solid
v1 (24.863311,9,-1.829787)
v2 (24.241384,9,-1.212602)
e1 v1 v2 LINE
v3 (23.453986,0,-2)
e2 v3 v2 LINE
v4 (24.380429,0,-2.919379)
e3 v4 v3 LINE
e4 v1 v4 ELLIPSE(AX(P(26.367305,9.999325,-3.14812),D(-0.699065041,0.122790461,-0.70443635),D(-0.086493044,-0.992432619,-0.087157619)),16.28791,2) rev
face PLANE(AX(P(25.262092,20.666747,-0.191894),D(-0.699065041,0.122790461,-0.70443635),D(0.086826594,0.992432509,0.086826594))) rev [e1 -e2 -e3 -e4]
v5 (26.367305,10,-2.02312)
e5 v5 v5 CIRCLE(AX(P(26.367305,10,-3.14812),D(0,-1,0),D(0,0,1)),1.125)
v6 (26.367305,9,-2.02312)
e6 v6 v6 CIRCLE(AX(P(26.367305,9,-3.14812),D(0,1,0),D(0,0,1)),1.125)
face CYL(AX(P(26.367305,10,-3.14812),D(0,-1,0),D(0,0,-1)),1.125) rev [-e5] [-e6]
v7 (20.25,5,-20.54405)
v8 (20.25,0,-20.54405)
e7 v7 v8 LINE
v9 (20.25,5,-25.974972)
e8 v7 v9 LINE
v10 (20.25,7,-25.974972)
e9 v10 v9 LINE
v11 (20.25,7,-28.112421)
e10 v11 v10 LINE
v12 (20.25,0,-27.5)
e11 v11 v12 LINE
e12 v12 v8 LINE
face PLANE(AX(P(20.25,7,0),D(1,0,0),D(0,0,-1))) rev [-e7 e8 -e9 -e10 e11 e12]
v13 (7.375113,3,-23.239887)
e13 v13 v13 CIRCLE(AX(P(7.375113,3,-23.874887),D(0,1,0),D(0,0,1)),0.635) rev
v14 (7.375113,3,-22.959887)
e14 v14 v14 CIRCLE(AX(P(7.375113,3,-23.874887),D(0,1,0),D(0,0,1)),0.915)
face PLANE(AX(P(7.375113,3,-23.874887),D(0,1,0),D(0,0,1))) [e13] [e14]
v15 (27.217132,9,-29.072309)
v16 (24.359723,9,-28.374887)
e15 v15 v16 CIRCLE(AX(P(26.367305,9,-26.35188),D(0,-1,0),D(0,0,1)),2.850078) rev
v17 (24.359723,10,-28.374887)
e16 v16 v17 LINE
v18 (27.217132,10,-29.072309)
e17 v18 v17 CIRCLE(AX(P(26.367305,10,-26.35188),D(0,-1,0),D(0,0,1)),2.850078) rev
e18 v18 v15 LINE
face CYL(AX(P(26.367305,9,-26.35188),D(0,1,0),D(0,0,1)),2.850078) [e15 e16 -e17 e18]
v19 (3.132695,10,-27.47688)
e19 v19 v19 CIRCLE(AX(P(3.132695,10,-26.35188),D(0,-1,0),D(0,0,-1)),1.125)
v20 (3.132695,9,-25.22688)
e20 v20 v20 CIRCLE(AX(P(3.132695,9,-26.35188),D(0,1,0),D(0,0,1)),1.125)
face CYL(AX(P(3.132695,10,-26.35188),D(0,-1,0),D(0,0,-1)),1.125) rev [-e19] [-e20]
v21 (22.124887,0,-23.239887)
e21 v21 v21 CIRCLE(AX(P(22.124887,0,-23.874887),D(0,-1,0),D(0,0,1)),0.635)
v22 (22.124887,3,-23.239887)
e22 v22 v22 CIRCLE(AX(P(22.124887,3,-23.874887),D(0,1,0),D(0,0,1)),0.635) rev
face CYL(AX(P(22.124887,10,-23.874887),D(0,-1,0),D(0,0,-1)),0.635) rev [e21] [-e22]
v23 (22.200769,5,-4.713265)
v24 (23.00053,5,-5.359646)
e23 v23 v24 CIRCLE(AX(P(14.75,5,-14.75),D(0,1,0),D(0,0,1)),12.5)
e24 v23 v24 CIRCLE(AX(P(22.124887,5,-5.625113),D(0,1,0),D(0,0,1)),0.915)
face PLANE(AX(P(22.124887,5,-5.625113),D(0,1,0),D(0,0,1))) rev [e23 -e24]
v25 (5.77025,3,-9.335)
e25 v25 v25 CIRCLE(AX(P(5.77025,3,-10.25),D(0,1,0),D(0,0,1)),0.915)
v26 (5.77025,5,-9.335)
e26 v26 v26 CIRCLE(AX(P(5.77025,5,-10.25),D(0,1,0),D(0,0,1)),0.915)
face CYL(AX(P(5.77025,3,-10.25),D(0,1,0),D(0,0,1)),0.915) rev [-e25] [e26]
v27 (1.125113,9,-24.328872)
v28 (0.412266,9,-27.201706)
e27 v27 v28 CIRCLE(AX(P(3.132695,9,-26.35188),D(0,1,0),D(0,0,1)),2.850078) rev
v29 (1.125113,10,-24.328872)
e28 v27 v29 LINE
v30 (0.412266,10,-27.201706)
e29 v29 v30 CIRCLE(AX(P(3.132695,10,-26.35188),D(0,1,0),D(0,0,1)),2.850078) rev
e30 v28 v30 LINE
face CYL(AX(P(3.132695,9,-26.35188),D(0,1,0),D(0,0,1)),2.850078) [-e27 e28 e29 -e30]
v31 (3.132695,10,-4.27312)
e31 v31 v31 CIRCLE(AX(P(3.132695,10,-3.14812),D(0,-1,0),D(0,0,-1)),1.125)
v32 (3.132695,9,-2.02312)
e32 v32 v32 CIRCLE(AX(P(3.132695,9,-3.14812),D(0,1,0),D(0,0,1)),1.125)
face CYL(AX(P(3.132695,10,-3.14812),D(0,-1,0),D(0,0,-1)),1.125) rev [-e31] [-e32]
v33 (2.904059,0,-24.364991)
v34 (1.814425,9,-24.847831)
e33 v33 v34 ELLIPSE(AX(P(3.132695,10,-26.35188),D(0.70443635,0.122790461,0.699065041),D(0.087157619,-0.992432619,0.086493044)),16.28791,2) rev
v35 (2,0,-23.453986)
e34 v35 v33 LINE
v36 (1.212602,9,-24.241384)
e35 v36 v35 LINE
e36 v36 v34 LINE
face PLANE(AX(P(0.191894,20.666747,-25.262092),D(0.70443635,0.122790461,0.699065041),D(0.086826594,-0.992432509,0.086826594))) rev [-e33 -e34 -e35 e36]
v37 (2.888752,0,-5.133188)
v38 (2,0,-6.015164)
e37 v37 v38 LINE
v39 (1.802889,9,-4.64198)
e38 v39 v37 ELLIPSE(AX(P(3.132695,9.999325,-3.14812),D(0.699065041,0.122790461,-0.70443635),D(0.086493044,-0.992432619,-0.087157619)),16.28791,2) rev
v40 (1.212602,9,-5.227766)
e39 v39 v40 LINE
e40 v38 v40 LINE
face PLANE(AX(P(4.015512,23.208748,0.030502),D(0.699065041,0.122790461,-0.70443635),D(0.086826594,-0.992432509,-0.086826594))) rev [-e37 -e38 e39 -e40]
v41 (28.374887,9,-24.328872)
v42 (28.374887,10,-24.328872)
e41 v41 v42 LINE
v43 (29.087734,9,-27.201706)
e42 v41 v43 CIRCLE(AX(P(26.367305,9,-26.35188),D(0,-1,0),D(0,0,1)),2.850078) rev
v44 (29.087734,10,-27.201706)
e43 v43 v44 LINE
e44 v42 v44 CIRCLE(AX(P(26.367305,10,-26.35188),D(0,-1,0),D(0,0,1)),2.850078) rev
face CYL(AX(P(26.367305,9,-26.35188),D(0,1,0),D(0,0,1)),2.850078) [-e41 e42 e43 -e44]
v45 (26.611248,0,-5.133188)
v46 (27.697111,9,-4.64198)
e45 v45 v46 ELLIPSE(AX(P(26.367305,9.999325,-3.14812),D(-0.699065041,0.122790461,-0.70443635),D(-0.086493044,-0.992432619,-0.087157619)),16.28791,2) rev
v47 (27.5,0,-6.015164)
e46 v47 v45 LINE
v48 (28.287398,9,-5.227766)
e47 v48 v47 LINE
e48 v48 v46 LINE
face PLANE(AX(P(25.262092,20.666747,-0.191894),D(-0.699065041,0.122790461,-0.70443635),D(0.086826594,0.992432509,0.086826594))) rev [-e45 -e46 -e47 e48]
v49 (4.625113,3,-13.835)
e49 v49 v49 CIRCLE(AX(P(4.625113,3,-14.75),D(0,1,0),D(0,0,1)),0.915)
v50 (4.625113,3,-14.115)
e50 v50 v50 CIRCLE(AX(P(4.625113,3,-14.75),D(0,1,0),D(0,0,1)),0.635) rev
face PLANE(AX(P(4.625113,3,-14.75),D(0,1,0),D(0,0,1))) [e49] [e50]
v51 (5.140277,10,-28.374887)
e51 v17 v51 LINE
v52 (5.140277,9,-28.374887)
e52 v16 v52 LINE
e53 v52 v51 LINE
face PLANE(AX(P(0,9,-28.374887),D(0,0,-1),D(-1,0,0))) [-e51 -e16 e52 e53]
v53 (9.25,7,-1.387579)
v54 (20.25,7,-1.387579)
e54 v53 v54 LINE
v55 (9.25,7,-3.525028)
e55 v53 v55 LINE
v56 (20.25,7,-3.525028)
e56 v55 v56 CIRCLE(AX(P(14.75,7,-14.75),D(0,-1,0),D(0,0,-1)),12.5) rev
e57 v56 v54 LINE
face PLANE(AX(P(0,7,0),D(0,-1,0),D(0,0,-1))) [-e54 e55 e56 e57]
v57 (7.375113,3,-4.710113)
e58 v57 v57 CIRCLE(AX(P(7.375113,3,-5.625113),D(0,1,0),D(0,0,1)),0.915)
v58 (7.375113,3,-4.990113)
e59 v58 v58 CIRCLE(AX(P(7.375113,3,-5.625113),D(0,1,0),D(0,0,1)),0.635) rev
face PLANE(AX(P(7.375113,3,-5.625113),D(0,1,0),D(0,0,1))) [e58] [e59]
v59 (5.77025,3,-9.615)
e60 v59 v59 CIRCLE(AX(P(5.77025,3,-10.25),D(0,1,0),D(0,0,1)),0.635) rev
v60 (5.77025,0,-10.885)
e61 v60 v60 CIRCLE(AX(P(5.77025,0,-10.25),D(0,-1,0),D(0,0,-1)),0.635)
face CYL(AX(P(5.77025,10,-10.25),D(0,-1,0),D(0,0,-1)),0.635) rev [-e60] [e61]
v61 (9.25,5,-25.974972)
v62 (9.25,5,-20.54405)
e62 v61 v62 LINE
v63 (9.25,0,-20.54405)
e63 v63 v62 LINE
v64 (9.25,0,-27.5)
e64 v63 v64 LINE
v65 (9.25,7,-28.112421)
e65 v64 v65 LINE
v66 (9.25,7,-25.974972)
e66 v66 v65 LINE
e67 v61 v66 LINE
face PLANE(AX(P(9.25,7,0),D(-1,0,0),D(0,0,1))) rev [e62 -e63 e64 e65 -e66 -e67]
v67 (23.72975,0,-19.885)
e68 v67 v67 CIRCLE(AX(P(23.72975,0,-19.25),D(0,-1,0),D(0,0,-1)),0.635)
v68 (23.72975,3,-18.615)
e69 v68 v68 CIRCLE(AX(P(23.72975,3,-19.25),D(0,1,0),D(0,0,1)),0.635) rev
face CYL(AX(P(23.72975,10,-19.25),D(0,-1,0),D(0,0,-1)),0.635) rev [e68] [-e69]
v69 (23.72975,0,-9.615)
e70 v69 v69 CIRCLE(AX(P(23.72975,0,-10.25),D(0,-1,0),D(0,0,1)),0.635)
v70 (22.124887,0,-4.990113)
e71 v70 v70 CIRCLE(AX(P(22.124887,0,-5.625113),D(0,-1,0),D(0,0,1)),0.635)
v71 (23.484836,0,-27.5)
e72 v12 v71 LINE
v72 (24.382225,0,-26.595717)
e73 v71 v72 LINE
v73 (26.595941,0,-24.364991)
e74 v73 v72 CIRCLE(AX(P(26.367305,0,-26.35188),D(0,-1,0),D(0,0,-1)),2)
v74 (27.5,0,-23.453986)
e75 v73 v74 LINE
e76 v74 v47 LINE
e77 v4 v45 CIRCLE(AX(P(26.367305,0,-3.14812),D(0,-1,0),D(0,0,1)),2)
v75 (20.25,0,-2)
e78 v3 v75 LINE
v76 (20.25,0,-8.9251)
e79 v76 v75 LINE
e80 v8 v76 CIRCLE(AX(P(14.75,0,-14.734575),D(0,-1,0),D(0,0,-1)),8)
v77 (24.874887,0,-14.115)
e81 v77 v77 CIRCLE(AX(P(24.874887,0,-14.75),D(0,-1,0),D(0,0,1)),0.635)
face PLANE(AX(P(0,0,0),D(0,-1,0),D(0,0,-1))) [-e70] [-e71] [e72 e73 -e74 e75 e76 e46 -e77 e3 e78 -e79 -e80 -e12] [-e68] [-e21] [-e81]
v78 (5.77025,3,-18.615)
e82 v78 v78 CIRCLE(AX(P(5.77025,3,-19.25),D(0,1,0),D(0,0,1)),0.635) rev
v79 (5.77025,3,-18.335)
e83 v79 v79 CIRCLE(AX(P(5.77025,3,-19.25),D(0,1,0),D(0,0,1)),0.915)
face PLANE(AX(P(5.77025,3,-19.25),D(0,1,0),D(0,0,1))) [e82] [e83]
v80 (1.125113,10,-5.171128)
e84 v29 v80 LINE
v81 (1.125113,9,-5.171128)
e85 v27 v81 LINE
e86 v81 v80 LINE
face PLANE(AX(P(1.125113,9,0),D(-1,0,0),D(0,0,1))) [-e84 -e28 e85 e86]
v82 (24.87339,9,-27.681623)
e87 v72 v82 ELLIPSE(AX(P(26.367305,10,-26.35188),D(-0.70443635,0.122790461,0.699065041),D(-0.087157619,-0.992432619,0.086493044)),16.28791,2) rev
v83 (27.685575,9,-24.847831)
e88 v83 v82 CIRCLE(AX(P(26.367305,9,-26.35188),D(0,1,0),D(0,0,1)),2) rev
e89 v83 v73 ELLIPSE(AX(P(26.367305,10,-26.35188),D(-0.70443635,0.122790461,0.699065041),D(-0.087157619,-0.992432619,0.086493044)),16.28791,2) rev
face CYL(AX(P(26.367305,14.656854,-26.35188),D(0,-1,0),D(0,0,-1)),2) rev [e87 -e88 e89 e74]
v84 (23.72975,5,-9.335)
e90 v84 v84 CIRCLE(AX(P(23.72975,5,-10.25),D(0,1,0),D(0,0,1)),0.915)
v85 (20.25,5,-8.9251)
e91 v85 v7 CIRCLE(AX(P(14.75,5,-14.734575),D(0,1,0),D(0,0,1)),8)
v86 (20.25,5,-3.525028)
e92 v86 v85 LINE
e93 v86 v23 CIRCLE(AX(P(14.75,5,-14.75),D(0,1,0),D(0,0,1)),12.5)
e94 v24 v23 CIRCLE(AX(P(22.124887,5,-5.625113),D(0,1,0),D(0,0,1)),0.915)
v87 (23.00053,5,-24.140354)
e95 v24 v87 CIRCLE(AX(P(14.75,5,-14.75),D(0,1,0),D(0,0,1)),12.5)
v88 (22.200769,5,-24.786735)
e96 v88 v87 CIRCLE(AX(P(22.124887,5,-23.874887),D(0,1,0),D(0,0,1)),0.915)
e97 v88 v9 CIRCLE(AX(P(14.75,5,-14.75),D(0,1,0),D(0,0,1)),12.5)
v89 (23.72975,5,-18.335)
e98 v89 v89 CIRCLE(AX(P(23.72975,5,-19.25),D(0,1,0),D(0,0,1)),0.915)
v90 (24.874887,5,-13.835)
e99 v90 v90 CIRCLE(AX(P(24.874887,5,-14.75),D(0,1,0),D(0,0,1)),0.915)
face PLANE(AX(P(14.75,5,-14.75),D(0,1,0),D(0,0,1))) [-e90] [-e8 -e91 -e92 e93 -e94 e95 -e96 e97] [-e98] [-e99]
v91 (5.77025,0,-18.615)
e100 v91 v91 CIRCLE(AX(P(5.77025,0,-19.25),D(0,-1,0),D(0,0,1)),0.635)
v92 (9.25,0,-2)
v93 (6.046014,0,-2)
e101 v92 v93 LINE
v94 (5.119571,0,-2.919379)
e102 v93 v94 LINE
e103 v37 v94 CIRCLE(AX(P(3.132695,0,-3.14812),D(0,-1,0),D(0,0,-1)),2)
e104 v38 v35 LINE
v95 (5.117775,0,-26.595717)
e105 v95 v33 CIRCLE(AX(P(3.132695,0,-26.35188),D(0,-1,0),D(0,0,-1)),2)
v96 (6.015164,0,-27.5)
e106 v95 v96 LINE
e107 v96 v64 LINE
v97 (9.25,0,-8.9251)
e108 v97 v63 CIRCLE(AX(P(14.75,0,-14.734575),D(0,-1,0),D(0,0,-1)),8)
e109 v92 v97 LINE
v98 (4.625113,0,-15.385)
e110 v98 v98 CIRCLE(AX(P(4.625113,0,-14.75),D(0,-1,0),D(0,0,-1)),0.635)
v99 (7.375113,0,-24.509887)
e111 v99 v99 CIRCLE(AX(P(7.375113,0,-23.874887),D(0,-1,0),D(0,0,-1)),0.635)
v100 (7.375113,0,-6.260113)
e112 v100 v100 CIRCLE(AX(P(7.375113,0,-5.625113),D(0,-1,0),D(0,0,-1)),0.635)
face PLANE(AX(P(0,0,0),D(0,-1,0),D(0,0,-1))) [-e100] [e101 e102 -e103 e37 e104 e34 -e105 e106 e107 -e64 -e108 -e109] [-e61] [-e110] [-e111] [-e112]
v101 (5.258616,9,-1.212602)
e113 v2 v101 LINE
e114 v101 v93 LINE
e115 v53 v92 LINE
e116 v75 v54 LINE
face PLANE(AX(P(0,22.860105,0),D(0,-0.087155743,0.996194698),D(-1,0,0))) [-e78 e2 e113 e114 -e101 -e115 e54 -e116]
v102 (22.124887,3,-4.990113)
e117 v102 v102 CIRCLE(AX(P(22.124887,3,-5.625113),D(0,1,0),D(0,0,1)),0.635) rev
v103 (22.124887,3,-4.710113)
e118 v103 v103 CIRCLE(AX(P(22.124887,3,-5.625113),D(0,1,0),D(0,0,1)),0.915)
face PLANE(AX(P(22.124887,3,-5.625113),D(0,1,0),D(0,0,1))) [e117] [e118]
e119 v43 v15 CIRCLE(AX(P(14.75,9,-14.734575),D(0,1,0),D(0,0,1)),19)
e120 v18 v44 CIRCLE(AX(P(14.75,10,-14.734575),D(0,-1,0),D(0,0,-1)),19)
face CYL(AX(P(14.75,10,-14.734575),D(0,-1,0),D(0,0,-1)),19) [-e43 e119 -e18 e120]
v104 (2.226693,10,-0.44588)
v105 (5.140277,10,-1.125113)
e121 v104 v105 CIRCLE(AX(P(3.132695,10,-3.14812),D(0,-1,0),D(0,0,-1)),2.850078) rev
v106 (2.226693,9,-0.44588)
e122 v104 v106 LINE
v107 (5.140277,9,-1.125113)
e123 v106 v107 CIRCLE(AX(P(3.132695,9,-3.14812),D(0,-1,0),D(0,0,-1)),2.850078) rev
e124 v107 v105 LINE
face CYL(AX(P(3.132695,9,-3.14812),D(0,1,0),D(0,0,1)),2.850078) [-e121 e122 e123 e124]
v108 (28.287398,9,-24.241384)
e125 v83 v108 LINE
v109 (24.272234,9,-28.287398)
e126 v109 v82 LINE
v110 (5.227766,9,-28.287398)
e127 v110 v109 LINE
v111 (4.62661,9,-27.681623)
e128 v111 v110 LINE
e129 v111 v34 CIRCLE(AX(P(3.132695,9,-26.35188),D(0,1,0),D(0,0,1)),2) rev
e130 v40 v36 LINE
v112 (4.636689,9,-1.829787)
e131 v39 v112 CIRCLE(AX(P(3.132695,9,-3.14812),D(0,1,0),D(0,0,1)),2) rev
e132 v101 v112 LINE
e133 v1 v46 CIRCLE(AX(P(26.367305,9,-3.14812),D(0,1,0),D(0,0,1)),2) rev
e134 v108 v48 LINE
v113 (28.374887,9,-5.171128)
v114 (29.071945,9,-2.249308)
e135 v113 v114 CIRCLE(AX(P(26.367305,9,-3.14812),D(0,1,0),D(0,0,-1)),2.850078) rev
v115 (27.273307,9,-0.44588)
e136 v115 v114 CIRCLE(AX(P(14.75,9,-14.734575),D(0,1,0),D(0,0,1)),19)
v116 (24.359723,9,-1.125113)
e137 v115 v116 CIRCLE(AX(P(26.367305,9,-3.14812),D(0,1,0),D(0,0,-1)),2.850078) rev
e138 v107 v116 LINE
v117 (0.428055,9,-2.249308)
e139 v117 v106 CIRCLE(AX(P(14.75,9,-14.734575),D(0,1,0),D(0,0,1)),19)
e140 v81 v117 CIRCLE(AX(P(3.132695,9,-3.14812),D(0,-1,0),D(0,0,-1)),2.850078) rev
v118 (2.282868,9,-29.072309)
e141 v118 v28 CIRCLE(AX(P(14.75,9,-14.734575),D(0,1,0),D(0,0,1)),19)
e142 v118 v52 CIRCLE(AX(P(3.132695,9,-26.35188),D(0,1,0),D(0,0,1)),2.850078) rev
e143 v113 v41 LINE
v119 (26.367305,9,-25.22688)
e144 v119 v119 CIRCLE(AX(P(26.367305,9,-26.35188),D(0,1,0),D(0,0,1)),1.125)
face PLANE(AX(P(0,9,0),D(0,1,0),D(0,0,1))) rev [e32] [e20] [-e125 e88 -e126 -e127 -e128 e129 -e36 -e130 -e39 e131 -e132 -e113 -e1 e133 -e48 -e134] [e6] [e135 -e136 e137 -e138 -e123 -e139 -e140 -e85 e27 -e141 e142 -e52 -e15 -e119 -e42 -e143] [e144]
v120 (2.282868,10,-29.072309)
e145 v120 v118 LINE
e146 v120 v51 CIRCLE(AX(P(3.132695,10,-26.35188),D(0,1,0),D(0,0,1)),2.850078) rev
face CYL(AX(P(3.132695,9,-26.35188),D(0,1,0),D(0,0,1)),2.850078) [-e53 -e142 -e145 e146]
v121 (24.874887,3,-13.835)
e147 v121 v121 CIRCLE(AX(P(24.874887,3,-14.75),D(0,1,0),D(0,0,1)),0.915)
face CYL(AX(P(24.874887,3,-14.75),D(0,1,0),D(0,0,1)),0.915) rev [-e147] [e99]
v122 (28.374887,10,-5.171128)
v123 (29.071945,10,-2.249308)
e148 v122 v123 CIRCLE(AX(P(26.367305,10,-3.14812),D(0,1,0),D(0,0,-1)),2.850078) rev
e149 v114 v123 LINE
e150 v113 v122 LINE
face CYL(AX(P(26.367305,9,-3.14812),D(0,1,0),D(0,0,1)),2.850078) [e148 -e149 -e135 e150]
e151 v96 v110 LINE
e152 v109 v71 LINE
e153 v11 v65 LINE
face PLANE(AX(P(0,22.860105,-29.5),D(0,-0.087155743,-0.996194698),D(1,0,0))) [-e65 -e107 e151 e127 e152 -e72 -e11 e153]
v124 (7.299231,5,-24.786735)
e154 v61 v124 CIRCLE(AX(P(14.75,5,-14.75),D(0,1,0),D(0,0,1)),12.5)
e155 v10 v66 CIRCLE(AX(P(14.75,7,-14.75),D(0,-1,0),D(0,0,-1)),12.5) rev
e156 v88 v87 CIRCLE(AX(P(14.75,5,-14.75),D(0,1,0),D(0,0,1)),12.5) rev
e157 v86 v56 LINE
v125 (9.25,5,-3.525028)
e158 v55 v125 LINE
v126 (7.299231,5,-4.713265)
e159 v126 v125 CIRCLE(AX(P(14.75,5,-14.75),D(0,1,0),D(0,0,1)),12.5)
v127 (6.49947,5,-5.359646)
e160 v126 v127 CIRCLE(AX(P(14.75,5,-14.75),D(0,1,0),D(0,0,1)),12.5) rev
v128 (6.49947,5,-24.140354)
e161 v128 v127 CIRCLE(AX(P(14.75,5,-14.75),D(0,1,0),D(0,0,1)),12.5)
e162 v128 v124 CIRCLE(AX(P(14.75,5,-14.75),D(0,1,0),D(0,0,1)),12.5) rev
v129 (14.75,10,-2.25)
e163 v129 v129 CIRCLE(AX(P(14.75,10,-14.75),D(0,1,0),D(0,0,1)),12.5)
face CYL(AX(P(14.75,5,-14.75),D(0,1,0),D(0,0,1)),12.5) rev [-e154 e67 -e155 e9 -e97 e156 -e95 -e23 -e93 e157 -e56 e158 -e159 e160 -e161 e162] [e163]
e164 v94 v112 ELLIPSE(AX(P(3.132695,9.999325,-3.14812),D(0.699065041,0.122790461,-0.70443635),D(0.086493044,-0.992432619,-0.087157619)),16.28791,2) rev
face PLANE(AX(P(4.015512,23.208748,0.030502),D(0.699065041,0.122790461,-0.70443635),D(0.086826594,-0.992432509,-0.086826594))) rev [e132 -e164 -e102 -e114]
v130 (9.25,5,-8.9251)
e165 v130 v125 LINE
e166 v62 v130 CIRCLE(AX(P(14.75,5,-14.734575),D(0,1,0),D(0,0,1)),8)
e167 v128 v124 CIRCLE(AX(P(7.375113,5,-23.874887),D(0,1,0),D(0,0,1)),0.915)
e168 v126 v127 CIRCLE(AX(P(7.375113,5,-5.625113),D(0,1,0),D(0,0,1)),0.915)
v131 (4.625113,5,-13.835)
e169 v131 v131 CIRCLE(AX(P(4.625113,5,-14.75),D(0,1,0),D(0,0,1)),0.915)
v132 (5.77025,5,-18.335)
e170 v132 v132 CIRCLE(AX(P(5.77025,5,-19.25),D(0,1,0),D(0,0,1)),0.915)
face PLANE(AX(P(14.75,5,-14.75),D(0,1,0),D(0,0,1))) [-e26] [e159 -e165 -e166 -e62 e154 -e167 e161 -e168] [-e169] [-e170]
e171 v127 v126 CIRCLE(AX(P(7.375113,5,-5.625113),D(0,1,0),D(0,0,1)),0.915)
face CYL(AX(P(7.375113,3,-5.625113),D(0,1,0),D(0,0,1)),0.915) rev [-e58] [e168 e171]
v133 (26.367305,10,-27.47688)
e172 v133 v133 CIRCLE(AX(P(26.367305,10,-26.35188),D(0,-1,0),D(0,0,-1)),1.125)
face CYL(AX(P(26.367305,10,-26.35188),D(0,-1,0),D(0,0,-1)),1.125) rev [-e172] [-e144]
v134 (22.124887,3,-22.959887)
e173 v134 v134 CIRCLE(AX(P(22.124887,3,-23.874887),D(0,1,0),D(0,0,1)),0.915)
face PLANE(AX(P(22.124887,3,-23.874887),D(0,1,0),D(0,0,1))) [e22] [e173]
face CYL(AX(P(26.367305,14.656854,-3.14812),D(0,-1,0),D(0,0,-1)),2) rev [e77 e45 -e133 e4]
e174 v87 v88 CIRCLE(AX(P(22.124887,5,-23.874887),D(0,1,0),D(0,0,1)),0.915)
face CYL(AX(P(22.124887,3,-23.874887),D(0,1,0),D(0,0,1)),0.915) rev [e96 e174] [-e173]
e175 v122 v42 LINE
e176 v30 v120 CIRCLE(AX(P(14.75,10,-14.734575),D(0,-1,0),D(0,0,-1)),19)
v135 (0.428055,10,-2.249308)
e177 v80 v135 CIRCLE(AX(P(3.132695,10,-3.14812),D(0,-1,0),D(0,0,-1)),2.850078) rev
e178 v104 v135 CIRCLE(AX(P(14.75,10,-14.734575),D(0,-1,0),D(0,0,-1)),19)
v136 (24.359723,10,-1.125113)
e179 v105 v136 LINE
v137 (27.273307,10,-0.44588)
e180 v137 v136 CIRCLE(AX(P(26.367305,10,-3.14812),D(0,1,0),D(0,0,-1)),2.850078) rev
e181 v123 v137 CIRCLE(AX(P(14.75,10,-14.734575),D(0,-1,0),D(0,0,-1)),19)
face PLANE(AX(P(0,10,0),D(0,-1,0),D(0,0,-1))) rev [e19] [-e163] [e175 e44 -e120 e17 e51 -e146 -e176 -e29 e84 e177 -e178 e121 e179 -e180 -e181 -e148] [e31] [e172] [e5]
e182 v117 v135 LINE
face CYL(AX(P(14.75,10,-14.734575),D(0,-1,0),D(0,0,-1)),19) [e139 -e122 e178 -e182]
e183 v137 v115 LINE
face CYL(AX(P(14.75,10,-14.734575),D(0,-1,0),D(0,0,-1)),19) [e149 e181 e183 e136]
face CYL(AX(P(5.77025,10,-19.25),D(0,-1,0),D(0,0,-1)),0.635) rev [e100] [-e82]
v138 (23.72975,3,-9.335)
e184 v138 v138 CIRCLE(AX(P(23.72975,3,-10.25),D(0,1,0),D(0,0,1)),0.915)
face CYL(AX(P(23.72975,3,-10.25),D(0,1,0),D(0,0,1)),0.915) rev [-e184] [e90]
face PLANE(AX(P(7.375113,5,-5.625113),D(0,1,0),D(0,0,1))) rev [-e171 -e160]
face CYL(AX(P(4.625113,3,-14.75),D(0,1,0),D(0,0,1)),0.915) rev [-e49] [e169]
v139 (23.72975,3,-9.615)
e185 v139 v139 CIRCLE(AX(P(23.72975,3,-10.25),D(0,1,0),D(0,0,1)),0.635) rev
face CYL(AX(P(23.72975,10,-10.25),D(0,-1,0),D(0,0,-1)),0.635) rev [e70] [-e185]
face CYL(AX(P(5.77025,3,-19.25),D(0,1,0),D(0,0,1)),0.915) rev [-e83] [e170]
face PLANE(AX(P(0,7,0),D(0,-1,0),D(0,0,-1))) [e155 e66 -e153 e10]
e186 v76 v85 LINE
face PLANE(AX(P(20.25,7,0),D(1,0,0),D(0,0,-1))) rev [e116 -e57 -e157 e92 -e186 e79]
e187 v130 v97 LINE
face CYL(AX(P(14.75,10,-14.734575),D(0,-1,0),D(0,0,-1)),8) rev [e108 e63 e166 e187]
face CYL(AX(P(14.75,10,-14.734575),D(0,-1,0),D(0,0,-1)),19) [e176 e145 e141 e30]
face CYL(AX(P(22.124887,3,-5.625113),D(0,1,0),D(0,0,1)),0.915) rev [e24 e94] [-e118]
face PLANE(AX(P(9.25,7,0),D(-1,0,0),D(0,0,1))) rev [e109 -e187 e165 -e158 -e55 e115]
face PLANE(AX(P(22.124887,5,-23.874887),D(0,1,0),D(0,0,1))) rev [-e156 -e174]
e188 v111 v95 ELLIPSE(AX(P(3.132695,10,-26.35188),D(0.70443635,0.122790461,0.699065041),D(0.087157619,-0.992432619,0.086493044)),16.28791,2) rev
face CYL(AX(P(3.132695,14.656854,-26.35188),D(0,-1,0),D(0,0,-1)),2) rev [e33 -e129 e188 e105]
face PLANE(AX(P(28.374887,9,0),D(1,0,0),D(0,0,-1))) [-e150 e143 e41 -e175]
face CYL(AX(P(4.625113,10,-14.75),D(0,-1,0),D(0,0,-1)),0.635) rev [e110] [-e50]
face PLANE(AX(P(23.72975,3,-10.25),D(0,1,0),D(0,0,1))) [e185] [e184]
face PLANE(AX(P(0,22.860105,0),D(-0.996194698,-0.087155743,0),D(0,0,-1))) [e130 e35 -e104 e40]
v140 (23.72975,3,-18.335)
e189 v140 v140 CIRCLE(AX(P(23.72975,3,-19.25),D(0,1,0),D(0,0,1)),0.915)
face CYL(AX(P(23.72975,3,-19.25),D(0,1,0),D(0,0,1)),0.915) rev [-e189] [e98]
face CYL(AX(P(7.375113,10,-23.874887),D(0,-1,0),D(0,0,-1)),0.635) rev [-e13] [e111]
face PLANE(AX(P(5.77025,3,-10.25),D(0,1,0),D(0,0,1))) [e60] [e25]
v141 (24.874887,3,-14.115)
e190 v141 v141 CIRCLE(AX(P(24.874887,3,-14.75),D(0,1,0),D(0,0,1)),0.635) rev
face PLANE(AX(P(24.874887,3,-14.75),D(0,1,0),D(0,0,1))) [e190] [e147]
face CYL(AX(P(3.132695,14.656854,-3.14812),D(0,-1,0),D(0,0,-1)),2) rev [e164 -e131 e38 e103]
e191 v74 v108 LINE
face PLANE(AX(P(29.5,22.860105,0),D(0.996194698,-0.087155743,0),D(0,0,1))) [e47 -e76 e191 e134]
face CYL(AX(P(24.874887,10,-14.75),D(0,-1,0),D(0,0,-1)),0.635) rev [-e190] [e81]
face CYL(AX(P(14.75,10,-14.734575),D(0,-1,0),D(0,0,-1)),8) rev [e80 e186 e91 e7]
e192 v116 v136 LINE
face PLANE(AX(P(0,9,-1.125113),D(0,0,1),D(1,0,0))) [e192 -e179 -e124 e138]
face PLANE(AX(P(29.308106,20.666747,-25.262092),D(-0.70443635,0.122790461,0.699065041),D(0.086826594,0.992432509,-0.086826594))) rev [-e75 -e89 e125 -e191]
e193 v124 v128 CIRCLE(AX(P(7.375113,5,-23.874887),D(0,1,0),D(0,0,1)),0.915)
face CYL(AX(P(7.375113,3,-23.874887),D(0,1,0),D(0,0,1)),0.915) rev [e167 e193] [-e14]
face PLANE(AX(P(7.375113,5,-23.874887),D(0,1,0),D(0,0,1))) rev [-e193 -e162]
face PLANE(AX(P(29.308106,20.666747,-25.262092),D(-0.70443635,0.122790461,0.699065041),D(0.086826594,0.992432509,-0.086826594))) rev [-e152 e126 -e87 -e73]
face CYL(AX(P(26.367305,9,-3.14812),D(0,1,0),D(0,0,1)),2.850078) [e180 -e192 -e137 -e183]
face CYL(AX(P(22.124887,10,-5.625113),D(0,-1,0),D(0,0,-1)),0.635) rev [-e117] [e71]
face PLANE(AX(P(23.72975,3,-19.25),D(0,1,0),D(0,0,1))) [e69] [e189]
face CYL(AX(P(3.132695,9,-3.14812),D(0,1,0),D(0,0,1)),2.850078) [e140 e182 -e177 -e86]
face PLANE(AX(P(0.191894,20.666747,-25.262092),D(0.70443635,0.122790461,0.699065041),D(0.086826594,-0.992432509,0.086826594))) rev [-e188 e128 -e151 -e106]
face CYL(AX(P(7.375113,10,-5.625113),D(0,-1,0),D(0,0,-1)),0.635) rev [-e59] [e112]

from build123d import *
from OCP.BRepFilletAPI import BRepFilletAPI_MakeChamfer

# Parameters (mm, degrees)
SKETCH1_W               = 29.5
SKETCH1_H               = 29.5
BOSS_EXTRUDE1_DEPTH     = 10
SKETCH2_R               = 12.5
CUT_EXTRUDE1_DEPTH      = 5
CHAMFER1_SIZE           = 22.860104606
CHAMFER1_SIZE_2         = 2
CHAMFER2_SIZE           = 4
CHAMFER2_SIZE2          = 4.030734246
SKETCH5_R               = 8
CUT_EXTRUDE2_DEPTH      = 10
BOSS_EXTRUDE2_START     = -1
BOSS_EXTRUDE2_DEPTH     = 1
MIRROR2_START           = -1
MIRROR2_COPY_1_DEPTH    = 1
CUT_EXTRUDE3_DEPTH      = 43.277768842
CUT_EXTRUDE3_DEPTH_BACK = 43.277768842
SKETCH7_R               = 1.125
SKETCH8_R               = 0.635
CUT_EXTRUDE4_DEPTH      = 43.501879232
SKETCH10_R              = 0.915
CUT_EXTRUDE5_DEPTH      = 2
SKETCH11_OUTSIDE_W      = 39.354
SKETCH11_OUTSIDE_H      = 39.324
SKETCH11_OUTSIDE_R      = 19
CUT_EXTRUDE6_DEPTH      = 43.501879232
SKETCH12_R              = 2
CUT_EXTRUDE7_DEPTH      = 9
SKETCH13_W              = 11
SKETCH13_H              = 30.855989766
CUT_EXTRUDE8_DEPTH      = 7


with BuildPart() as part:
    # Sketch1 → Boss-Extrude1 (new body)
    with BuildSketch(Plane(origin=(0, 0, 0), x_dir=(1, 0, 0), z_dir=(0, 1, 0))):
        with Locations((14.75, 14.75)):
            Rectangle(SKETCH1_W, SKETCH1_H)
    extrude(amount=BOSS_EXTRUDE1_DEPTH)

    # Sketch2 → Cut-Extrude1 (cut)
    with BuildSketch(Plane(origin=(0, 10, 0), x_dir=(1, 0, 0), z_dir=(0, 1, 0))):
        with Locations(Location((14.75, 14.75, 0), (0, 0, 270))):
            Circle(SKETCH2_R)
    extrude(amount=-CUT_EXTRUDE1_DEPTH, mode=Mode.SUBTRACT)

    # Chamfer1
    # the kernel refuses this chamfer: 22.860104606, 2 mm, written as the material it takes off along each edge
    with BuildSketch(Plane(origin=(-59.427907001, 0, 0), x_dir=(0, 1, 0), z_dir=(1, 0, 0)), Plane(origin=(29.5, 0, 59.427907001), x_dir=(0, 1, 0), z_dir=(0, 0, -1)), Plane(origin=(0, 0, -88.927907001), x_dir=(0, 1, 0), z_dir=(0, 0, 1))) as chamfer1_piece_1:
        Polygon((CHAMFER1_SIZE, 0), (0, -CHAMFER1_SIZE_2), (0, 0), align=None)
    extrude(amount=148.355814002, mode=Mode.SUBTRACT)
    with BuildSketch(Plane(origin=(88.927907001, 0, -29.5), x_dir=(0, 0, 1), z_dir=(-1, 0, 0))) as chamfer1_piece_2:
        Polygon((CHAMFER1_SIZE_2, 0), (0, CHAMFER1_SIZE), (0, 0), align=None)
    extrude(amount=148.355814002, mode=Mode.SUBTRACT)

    # Chamfer2: one chamfer whose edges measure the first distance from different faces: ONE call of the kernel's chamfer builder (chamfer() names one face for all edges)
    chamfer2_edges_1 = [part.edges().sort_by_distance(p)[0] for p in [
        (1.562556682, 5, -27.937443318),
        (27.937443318, 5, -27.937443318),
    ]]
    chamfer2_side_1 = [part.faces().sort_by_distance(p)[0] for p in [
        (14.75, 5.055285333, -27.942280158),
    ]]
    chamfer2_edges_2 = [part.edges().sort_by_distance(p)[0] for p in [
        (1.562556682, 5, -1.562556682),
    ]]
    chamfer2_side_2 = [part.faces().sort_by_distance(p)[0] for p in [
        (1.557719842, 5.055285333, -14.75),
    ]]
    chamfer2_edges_3 = [part.edges().sort_by_distance(p)[0] for p in [
        (27.937443318, 5, -1.562556682),
    ]]
    chamfer2_side_3 = [part.faces().sort_by_distance(p)[0] for p in [
        (27.942280158, 5.055285333, -14.75),
    ]]
    chamfer2 = BRepFilletAPI_MakeChamfer(part.part.solid().wrapped)
    for e in chamfer2_edges_1:
        chamfer2.Add(CHAMFER2_SIZE, CHAMFER2_SIZE2, e.wrapped, chamfer2_side_1[0].wrapped)  # the first distance lies on this face
    for e in chamfer2_edges_2:
        chamfer2.Add(CHAMFER2_SIZE, CHAMFER2_SIZE2, e.wrapped, chamfer2_side_2[0].wrapped)  # the first distance lies on this face
    for e in chamfer2_edges_3:
        chamfer2.Add(CHAMFER2_SIZE, CHAMFER2_SIZE2, e.wrapped, chamfer2_side_3[0].wrapped)  # the first distance lies on this face
    add(Compound.cast(chamfer2.Shape()), mode=Mode.REPLACE)

    # Sketch5 → Cut-Extrude2 (cut)
    with BuildSketch(Plane.XZ):
        with Locations(Location((14.75, -14.734574622, 0), (0, 0, 270))):
            Circle(SKETCH5_R)
    extrude(amount=-CUT_EXTRUDE2_DEPTH, mode=Mode.SUBTRACT)

    # Boss-Extrude2: read off the stored shape, not the designer's step
    # Boss-Extrude2 outline → Boss-Extrude2 (add)
    with BuildSketch(Plane(origin=(0, 10, 0), x_dir=(1, 0, 0), z_dir=(0, 1, 0)).offset(BOSS_EXTRUDE2_START)):
        with BuildLine():
            Line((1.125113365, 5.14027687), (5.171127626, 1.125113365))
            Line((5.171127626, 1.125113365), (24.328872374, 1.125113365))
            Line((24.328872374, 1.125113365), (28.374886635, 5.14027687))
            Line((28.374886635, 5.14027687), (28.374886635, 24.328872374))
            Line((28.374886635, 24.328872374), (24.35972313, 28.374886635))
            Line((24.35972313, 28.374886635), (5.14027687, 28.374886635))
            ThreePointArc((5.14027687, 28.374886635), (1.109687987, 28.359461258), (1.125113365, 24.328872374))
            Line((1.125113365, 24.328872374), (1.125113365, 5.14027687))
        make_face()
        Polygon((24.272234466, 28.287397972), (28.287397972, 24.241383711), (28.287397972, 5.227765534), (24.241383711, 1.212602028), (5.258616289, 1.212602028), (1.212602028, 5.227765534), (1.212602028, 24.241383711), (5.227765534, 28.287397972), align=None, mode=Mode.SUBTRACT)
    boss_extrude2 = extrude(amount=BOSS_EXTRUDE2_DEPTH)

    # Mirror1: Boss-Extrude2 across plane
    add(boss_extrude2.mirror(Plane(origin=(14.75, 0, 0), x_dir=(0, 0, 1), z_dir=(1, 0, 0))))

    # Mirror2: Boss-Extrude2 across plane
    add(boss_extrude2.mirror(Plane.XY.offset(-14.75)))

    # Mirror2 copy 1 sketch → Mirror2 copy 1 (add)
    with BuildSketch(Plane(origin=(29.5, 10, -29.5), x_dir=(-1, 0, 0), z_dir=(0, 1, 0)).offset(MIRROR2_START)):
        with BuildLine():
            Line((1.125113365, 5.14027687), (5.171127626, 1.125113365))
            Line((5.171127626, 1.125113365), (24.328872374, 1.125113365))
            Line((24.328872374, 1.125113365), (28.374886635, 5.14027687))
            Line((28.374886635, 5.14027687), (28.374886635, 24.328872374))
            Line((28.374886635, 24.328872374), (24.35972313, 28.374886635))
            Line((24.35972313, 28.374886635), (5.14027687, 28.374886635))
            ThreePointArc((5.14027687, 28.374886635), (1.109687987, 28.359461258), (1.125113365, 24.328872374))
            Line((1.125113365, 24.328872374), (1.125113365, 5.14027687))
        make_face()
        Polygon((24.272234466, 28.287397972), (28.287397972, 24.241383711), (28.287397972, 5.227765534), (24.241383711, 1.212602028), (5.258616289, 1.212602028), (1.212602028, 5.227765534), (1.212602028, 24.241383711), (5.227765534, 28.287397972), align=None, mode=Mode.SUBTRACT)
    extrude(amount=MIRROR2_COPY_1_DEPTH)

    # Sketch7 → Cut-Extrude3 (cut, two sides: drawn at the far end of the back side and taken through both)
    with BuildSketch(Plane.XZ.offset(-9).offset(-CUT_EXTRUDE3_DEPTH_BACK)):
        with Locations(Location((3.132695117, -3.148120495, 0), (0, 0, 270))):
            Circle(SKETCH7_R)
        with Locations(Location((26.367304883, -3.148120495, 0), (0, 0, 308.909428046))):
            Circle(SKETCH7_R)
        with Locations(Location((26.367304883, -26.351879505, 0), (0, 0, 270))):
            Circle(SKETCH7_R)
        with Locations(Location((3.132695117, -26.351879505, 0), (0, 0, 270))):
            Circle(SKETCH7_R)
    extrude(amount=CUT_EXTRUDE3_DEPTH + CUT_EXTRUDE3_DEPTH_BACK, mode=Mode.SUBTRACT)

    # Sketch8 → Cut-Extrude4 (cut, through all)
    with BuildSketch(Plane.XZ):
        with Locations(Location((7.375113365, -5.625113365, 0), (0, 0, 270))):
            Circle(SKETCH8_R)
        with Locations(Location((7.375113365, -23.874886635, 0), (0, 0, 270))):
            Circle(SKETCH8_R)
        with Locations(Location((4.625113365, -14.75, 0), (0, 0, 270))):
            Circle(SKETCH8_R)
        with Locations(Location((22.124886635, -23.874886635, 0), (0, 0, 90))):
            Circle(SKETCH8_R)
        with Locations(Location((24.874886635, -14.75, 0), (0, 0, 90))):
            Circle(SKETCH8_R)
        with Locations(Location((22.124886635, -5.625113365, 0), (0, 0, 90))):
            Circle(SKETCH8_R)
        with Locations(Location((5.770249527, -10.25, 0), (0, 0, 270))):
            Circle(SKETCH8_R)
        with Locations(Location((5.770249527, -19.25, 0), (0, 0, 90))):
            Circle(SKETCH8_R)
        with Locations(Location((23.729750473, -10.25, 0), (0, 0, 90))):
            Circle(SKETCH8_R)
        with Locations(Location((23.729750473, -19.25, 0), (0, 0, 270))):
            Circle(SKETCH8_R)
    extrude(amount=-CUT_EXTRUDE4_DEPTH, mode=Mode.SUBTRACT)

    # Sketch10 → Cut-Extrude5 (cut)
    with BuildSketch(Plane(origin=(0, 5, 0), x_dir=(1, 0, 0), z_dir=(0, 1, 0))):
        with Locations(Location((7.375113365, 23.874886635, 0), (0, 0, 270))):
            Circle(SKETCH10_R)
        with Locations(Location((4.625113365, 14.75, 0), (0, 0, 270))):
            Circle(SKETCH10_R)
        with Locations(Location((7.375113365, 5.625113365, 0), (0, 0, 270))):
            Circle(SKETCH10_R)
        with Locations(Location((22.124886635, 5.625113365, 0), (0, 0, 270))):
            Circle(SKETCH10_R)
        with Locations(Location((24.874886635, 14.75, 0), (0, 0, 270))):
            Circle(SKETCH10_R)
        with Locations(Location((22.124886635, 23.874886635, 0), (0, 0, 270))):
            Circle(SKETCH10_R)
        with Locations(Location((5.770249527, 19.25, 0), (0, 0, 270))):
            Circle(SKETCH10_R)
        with Locations(Location((5.770249527, 10.25, 0), (0, 0, 270))):
            Circle(SKETCH10_R)
        with Locations(Location((23.729750473, 10.25, 0), (0, 0, 270))):
            Circle(SKETCH10_R)
        with Locations(Location((23.729750473, 19.25, 0), (0, 0, 270))):
            Circle(SKETCH10_R)
    extrude(amount=-CUT_EXTRUDE5_DEPTH, mode=Mode.SUBTRACT)

    # Sketch11 outside → Cut-Extrude6 (cut, through all)
    with BuildSketch(Plane.XZ):
        with Locations((14.75, -14.75)):
            Rectangle(SKETCH11_OUTSIDE_W, SKETCH11_OUTSIDE_H)
        with Locations((14.75, -14.734574622)):
            Circle(SKETCH11_OUTSIDE_R, mode=Mode.SUBTRACT)
    extrude(amount=-CUT_EXTRUDE6_DEPTH, mode=Mode.SUBTRACT)

    # Sketch12 → Cut-Extrude7 (cut)
    with BuildSketch(Plane.XZ):
        with Locations((3.132695117, -3.148120495)):
            Circle(SKETCH12_R)
        with Locations((26.367304883, -3.148120495)):
            Circle(SKETCH12_R)
        with Locations((26.367304883, -26.351879505)):
            Circle(SKETCH12_R)
        with Locations((3.132695117, -26.351879505)):
            Circle(SKETCH12_R)
    extrude(amount=-CUT_EXTRUDE7_DEPTH, mode=Mode.SUBTRACT)

    # Sketch13 → Cut-Extrude8 (cut)
    with BuildSketch(Plane.XZ):
        with Locations((14.75, -15.427994883)):
            Rectangle(SKETCH13_W, SKETCH13_H)
    extrude(amount=-CUT_EXTRUDE8_DEPTH, mode=Mode.SUBTRACT)


solid = part.part
